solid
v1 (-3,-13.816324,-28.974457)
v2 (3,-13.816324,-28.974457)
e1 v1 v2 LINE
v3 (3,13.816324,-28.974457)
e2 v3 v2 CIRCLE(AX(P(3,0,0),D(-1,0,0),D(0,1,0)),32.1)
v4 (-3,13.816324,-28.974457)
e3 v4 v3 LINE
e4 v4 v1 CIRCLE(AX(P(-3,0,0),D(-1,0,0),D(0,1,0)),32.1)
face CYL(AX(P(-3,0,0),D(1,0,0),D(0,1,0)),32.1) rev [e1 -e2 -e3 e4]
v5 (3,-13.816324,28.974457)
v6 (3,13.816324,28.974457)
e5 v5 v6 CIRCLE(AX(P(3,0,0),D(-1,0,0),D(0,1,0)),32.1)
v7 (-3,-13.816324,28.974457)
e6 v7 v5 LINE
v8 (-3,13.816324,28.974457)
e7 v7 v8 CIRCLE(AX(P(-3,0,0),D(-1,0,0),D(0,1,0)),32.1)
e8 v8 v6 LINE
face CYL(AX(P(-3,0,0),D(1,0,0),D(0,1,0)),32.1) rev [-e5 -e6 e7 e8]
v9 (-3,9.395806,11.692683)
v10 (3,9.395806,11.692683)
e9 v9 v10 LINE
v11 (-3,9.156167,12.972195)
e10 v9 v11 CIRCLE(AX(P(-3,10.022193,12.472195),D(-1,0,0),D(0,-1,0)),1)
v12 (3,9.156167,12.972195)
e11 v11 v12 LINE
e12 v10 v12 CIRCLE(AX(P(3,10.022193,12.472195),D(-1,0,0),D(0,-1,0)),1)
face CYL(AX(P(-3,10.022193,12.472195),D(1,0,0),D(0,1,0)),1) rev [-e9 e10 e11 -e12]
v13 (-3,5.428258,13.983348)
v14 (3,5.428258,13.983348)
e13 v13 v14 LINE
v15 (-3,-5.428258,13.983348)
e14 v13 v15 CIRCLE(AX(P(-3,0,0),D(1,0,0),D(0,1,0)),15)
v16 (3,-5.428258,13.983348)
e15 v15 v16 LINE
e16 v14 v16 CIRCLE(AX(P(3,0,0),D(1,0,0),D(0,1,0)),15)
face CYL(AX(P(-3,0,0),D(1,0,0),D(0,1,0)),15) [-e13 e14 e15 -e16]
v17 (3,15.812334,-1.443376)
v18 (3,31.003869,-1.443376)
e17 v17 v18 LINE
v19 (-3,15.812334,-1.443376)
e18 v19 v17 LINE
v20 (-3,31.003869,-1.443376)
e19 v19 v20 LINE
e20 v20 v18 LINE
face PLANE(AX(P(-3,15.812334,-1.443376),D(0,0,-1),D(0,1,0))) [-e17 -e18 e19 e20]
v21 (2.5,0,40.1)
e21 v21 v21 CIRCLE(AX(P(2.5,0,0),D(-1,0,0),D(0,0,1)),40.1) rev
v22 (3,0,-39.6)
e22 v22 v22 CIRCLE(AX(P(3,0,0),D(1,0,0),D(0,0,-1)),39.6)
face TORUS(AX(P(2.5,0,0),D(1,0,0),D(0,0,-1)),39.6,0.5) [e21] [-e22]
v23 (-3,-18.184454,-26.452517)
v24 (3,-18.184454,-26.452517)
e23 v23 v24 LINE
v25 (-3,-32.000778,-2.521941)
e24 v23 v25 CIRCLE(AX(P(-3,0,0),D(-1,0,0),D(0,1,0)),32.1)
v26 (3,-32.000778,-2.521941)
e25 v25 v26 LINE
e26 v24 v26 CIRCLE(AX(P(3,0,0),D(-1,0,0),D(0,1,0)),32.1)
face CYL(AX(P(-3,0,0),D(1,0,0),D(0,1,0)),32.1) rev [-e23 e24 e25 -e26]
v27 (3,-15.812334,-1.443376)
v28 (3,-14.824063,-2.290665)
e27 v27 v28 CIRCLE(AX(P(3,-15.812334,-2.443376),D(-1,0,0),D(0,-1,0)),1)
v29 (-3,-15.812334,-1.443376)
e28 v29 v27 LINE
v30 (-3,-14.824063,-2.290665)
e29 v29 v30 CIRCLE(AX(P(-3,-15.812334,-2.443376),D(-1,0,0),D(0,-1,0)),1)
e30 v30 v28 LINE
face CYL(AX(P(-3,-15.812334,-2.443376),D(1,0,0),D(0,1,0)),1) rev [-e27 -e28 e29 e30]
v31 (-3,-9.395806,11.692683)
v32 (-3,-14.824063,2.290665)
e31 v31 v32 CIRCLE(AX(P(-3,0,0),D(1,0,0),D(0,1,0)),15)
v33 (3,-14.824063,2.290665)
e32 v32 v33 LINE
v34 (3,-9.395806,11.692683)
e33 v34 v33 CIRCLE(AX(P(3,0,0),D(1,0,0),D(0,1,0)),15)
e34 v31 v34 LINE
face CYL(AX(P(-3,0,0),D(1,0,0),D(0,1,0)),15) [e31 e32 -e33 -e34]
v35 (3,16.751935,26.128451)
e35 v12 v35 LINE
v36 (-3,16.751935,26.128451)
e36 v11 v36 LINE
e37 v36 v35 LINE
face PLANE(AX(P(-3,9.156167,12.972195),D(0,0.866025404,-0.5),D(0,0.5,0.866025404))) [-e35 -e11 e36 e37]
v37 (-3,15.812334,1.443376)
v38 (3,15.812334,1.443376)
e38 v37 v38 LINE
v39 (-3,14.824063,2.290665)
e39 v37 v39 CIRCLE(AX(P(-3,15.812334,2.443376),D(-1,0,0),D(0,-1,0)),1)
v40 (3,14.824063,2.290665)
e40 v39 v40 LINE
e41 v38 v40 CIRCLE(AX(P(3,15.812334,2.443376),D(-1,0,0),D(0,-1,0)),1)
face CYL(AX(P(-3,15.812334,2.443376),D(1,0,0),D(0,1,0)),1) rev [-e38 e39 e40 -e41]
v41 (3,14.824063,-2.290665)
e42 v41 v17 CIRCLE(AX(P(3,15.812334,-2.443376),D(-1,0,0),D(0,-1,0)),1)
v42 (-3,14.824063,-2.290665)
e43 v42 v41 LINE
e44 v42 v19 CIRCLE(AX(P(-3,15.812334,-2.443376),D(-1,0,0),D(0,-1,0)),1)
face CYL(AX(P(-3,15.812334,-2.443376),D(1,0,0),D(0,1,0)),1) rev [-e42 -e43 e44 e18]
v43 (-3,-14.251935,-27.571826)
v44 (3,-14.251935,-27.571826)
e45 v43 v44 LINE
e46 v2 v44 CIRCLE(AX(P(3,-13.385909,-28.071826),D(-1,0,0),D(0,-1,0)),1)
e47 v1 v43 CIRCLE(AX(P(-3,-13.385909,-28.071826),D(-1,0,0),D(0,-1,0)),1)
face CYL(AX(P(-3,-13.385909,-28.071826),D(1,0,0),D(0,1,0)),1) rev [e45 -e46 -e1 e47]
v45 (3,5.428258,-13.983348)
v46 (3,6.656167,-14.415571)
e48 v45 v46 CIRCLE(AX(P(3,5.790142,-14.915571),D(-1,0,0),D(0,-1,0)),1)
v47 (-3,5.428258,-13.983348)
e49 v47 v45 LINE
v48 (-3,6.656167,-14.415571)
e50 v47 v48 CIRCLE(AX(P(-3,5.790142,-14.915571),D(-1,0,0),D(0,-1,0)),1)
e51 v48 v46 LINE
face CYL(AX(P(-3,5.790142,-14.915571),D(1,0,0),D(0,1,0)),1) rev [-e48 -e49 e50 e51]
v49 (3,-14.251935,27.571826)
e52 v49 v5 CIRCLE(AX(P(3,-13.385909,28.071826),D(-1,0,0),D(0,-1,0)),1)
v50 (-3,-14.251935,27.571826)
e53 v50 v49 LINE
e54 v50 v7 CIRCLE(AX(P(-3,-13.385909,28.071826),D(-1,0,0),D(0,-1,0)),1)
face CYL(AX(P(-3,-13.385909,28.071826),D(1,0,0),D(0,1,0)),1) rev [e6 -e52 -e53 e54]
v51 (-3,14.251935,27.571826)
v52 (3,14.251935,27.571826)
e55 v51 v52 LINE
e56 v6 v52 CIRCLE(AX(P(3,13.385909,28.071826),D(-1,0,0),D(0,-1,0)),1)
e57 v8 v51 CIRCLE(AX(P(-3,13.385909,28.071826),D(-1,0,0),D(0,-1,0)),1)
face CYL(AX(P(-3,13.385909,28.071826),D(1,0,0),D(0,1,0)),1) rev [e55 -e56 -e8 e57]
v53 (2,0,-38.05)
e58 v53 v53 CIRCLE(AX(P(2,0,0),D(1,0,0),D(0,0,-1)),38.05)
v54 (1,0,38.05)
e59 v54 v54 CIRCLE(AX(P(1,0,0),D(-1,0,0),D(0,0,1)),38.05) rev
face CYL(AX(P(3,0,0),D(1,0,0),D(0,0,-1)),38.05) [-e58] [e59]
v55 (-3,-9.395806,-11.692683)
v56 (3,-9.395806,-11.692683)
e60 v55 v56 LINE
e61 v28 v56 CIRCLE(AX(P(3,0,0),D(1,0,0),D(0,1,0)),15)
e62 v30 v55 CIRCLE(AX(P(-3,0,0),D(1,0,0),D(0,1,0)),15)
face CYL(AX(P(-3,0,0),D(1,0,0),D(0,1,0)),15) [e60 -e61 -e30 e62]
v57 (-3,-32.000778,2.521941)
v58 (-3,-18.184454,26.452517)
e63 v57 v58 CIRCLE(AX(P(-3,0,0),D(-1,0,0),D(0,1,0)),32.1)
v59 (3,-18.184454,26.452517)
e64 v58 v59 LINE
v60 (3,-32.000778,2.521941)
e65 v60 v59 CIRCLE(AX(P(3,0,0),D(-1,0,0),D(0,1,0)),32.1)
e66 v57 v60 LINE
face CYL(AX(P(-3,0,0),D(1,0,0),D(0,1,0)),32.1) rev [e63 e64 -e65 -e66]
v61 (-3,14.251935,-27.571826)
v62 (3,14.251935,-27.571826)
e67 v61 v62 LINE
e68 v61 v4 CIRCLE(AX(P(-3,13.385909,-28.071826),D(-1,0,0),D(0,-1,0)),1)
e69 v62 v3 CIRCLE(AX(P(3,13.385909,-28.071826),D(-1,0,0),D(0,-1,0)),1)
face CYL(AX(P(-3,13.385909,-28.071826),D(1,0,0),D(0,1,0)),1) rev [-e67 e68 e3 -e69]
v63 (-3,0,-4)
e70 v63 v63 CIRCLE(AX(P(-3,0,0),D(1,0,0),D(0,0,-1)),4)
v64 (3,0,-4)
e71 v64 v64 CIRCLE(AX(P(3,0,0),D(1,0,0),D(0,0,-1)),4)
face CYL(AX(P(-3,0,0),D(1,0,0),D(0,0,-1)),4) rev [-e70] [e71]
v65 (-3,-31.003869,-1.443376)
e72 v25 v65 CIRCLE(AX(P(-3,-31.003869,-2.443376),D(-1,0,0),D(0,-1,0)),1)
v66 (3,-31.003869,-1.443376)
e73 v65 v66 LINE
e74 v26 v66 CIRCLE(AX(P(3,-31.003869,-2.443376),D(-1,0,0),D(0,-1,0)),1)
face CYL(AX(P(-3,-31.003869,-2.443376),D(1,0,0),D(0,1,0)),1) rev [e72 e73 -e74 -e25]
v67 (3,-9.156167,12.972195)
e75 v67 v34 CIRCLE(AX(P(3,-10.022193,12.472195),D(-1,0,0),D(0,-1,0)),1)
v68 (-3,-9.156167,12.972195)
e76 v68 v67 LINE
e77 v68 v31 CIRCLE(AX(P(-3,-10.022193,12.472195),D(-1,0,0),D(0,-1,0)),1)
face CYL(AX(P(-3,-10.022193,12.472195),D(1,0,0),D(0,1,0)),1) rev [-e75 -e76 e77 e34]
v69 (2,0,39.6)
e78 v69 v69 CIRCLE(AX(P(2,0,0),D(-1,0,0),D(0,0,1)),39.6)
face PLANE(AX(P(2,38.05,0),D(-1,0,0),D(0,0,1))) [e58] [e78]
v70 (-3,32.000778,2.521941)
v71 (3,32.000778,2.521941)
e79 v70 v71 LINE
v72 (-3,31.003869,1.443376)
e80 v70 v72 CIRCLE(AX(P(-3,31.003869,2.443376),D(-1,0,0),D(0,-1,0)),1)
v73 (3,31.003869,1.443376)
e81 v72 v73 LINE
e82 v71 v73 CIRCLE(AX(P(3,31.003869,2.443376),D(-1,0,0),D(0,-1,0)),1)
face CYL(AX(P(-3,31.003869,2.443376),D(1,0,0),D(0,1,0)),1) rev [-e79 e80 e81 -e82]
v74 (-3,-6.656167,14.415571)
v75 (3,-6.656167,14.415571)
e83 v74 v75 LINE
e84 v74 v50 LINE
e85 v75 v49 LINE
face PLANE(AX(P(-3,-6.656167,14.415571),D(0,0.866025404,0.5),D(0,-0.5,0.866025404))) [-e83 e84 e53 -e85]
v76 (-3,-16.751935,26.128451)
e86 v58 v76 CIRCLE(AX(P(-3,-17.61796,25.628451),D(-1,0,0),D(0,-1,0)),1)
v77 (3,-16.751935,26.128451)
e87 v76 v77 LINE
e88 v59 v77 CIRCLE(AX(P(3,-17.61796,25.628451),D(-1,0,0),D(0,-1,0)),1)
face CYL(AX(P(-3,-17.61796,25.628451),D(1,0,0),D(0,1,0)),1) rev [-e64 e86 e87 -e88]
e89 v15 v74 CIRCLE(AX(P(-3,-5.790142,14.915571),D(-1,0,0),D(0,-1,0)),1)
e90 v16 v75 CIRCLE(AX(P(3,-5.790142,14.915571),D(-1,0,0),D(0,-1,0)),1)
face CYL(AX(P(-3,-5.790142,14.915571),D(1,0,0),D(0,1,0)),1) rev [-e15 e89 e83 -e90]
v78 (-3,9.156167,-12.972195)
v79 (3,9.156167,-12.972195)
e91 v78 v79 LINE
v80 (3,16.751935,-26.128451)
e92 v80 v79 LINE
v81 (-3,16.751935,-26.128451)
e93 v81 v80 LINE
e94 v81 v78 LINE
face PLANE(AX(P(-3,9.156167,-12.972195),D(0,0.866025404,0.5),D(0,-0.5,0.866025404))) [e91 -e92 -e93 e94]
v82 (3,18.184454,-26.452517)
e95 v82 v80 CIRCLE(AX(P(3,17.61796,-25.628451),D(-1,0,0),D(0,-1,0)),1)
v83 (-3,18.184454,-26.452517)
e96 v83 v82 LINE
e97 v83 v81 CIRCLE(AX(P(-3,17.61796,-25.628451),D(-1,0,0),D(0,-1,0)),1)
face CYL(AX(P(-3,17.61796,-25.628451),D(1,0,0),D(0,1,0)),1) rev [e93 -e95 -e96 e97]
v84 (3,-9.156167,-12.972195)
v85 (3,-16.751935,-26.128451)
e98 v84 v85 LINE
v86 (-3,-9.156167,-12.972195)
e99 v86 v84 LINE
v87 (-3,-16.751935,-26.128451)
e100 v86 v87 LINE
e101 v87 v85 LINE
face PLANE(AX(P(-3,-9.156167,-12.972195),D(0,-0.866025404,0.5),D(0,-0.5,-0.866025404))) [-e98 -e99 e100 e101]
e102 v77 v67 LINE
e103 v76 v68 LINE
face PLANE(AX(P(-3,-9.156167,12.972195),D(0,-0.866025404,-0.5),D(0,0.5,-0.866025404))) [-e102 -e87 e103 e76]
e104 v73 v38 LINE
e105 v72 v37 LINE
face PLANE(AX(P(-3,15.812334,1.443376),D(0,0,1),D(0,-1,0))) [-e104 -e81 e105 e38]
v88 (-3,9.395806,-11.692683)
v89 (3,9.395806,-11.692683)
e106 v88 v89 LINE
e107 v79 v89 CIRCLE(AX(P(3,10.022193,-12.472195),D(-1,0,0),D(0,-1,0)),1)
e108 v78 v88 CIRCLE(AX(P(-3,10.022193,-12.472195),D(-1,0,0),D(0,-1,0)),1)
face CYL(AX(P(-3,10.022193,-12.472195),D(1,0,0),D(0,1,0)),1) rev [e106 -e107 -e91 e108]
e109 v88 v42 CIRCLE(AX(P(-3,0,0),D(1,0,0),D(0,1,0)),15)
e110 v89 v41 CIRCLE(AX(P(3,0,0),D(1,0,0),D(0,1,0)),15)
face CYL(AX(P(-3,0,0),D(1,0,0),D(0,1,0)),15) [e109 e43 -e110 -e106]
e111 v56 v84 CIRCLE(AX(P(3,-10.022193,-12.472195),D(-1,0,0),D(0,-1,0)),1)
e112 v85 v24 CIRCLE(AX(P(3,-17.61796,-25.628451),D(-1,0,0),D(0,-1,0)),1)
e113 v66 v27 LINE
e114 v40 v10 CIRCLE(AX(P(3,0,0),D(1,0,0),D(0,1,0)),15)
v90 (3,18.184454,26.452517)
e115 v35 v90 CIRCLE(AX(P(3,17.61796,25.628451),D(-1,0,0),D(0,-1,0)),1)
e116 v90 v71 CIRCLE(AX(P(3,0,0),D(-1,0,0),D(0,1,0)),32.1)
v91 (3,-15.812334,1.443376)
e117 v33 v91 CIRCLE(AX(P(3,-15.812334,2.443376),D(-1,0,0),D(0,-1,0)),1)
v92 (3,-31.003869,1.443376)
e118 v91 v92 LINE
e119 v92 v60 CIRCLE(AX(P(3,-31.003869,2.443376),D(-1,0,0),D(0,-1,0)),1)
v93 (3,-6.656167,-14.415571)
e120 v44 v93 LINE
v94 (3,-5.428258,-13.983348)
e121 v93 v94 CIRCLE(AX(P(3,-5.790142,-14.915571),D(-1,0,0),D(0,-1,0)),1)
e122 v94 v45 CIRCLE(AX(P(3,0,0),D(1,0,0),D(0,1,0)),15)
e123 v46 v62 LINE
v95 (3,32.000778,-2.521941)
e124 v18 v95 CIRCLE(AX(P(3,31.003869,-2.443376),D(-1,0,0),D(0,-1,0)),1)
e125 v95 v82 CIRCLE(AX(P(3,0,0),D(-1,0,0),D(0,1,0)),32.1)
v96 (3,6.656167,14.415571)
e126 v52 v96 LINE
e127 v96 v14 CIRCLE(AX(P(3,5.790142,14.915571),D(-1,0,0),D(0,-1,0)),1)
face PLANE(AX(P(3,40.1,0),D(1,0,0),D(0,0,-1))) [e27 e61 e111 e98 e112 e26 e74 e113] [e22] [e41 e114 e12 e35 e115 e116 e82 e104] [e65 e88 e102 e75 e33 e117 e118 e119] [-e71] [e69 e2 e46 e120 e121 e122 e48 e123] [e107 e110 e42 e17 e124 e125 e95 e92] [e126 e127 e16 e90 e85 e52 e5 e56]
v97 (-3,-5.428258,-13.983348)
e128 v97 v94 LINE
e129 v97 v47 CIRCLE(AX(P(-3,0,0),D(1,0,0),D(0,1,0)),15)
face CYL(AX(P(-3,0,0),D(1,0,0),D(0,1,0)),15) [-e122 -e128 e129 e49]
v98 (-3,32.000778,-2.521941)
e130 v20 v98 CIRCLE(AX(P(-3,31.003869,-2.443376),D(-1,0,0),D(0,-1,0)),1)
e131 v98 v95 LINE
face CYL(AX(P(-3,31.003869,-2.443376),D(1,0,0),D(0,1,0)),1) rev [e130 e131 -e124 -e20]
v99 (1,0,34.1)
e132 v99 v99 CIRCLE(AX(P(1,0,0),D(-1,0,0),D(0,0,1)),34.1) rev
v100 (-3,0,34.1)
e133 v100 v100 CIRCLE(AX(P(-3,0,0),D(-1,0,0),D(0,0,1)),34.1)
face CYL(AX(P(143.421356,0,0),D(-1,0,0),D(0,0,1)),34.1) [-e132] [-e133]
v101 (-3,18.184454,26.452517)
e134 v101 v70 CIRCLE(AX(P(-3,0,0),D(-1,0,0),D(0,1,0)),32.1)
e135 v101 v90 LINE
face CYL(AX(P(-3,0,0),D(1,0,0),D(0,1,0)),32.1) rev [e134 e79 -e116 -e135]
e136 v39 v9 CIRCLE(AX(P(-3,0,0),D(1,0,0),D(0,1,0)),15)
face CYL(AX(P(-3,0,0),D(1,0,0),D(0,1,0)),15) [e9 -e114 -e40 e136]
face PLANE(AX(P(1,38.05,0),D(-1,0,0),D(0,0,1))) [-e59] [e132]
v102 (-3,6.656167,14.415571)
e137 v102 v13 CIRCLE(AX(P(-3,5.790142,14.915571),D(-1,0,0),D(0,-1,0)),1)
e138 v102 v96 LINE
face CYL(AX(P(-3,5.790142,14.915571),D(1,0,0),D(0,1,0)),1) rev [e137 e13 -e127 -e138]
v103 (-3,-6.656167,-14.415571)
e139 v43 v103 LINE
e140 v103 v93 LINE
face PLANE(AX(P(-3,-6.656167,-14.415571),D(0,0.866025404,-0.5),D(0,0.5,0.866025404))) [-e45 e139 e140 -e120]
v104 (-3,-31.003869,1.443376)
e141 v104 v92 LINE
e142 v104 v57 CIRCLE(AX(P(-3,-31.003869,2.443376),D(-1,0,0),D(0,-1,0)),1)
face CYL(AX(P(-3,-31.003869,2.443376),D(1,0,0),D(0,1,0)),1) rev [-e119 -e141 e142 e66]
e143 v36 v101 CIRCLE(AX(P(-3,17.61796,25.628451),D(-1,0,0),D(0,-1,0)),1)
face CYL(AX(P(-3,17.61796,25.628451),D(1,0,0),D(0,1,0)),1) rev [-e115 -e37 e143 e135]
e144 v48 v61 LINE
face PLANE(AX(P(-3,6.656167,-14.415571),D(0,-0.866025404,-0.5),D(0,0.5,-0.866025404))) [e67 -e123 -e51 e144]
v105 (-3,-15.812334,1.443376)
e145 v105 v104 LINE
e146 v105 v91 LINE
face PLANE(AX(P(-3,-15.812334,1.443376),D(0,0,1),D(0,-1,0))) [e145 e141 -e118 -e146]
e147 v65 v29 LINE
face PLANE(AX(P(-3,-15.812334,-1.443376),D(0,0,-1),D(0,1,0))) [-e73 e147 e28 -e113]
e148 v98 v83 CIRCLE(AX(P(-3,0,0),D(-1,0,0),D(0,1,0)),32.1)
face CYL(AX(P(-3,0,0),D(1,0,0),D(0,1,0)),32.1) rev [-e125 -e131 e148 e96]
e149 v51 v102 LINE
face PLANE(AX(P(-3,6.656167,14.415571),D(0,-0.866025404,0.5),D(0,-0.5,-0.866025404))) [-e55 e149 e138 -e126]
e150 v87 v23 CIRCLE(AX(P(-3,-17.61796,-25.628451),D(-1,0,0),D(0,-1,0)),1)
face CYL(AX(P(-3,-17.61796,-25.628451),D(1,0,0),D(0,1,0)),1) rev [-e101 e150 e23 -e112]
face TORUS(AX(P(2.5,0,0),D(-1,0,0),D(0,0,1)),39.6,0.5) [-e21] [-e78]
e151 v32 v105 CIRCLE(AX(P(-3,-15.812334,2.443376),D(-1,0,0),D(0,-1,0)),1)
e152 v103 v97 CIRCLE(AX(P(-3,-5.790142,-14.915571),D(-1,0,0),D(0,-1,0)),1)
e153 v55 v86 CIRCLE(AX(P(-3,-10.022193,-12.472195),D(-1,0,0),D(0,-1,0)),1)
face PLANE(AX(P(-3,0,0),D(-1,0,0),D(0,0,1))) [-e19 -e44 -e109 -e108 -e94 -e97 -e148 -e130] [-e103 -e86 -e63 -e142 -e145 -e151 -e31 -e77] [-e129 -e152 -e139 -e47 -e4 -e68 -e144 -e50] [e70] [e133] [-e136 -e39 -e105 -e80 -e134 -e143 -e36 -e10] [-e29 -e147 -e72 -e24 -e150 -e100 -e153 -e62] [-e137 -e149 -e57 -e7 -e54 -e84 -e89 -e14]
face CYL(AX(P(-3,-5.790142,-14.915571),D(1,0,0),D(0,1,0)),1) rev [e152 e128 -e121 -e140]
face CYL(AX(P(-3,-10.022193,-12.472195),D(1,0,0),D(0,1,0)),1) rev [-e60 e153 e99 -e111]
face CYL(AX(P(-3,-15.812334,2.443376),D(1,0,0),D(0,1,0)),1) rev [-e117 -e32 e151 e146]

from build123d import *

# Parameters (mm, degrees)
CUT_EXTRUDE2_DEPTH      = 58.026485075
FILLET1_R               = 0.5
CUT_EXTRUDE5_DEPTH      = 58.026485145
CUT_EXTRUDE5_DEPTH_BACK = 58.026485145
SKETCH7_R               = 4
SKETCH9_R               = 50
SKETCH9_R_2             = 34.1
CUT_EXTRUDE6_DEPTH      = 4


with BuildPart() as part:
    # Sketch1 → Revolve2 (revolve)
    with BuildSketch(Plane.XY, mode=Mode.PRIVATE) as revolve2_sk:
        Polygon((-3, 0), (-3, 38.05), (2, 38.05), (2, 40.1), (3, 40.1), (3, 0), align=None)
    revolve(revolve2_sk.sketch.rotate(Axis((3, 0, 0), (-1, 0, 0)), 90), axis=Axis((3, 0, 0), (-1, 0, 0)))

    # Sketch2 → Cut-Extrude2 (cut, through all)
    with BuildSketch(Plane.ZY.offset(-3)):
        with BuildLine():
            Line((14.415571014, 6.656167139), (27.571826318, 14.25193468))
            ThreePointArc((27.571826318, 14.25193468), (28.368418684, 14.340913448), (28.97445739, 13.816324366))
            ThreePointArc((28.97445739, 13.816324366), (32.1, 0), (28.97445739, -13.816324366))
            ThreePointArc((28.97445739, -13.816324366), (28.368418684, -14.340913448), (27.571826318, -14.25193468))
            Line((27.571826318, -14.25193468), (14.415571014, -6.656167139))
            ThreePointArc((14.415571014, -6.656167139), (13.972302174, -6.122171697), (13.983347826, -5.428257877))
            ThreePointArc((13.983347826, -5.428257877), (15, 0), (13.983347826, 5.428257877))
            ThreePointArc((13.983347826, 5.428257877), (13.972302174, 6.122171697), (14.415571014, 6.656167139))
        make_face()
        with BuildLine():
            Line((12.972195341, -9.156167139), (26.128450645, -16.75193468))
            ThreePointArc((26.128450645, -16.75193468), (26.603804702, -17.397314521), (26.452516582, -18.184453977))
            ThreePointArc((26.452516582, -18.184453977), (16.05, -27.799415461), (2.521940807, -32.000778343))
            ThreePointArc((2.521940807, -32.000778343), (1.764613982, -31.73822797), (1.443375673, -31.00386936))
            Line((1.443375673, -31.00386936), (1.443375673, -15.812334278))
            ThreePointArc((1.443375673, -15.812334278), (1.684194871, -15.161454481), (2.290664693, -14.824063386))
            ThreePointArc((2.290664693, -14.824063386), (7.5, -12.990381057), (11.692683133, -9.395805509))
            ThreePointArc((11.692683133, -9.395805509), (12.288107303, -9.039282784), (12.972195341, -9.156167139))
        make_face()
        with BuildLine():
            Line((-1.443375673, -15.812334278), (-1.443375673, -31.00386936))
            ThreePointArc((-1.443375673, -31.00386936), (-1.764613982, -31.73822797), (-2.521940807, -32.000778343))
            ThreePointArc((-2.521940807, -32.000778343), (-16.05, -27.799415461), (-26.452516582, -18.184453977))
            ThreePointArc((-26.452516582, -18.184453977), (-26.603804702, -17.397314521), (-26.128450645, -16.75193468))
            Line((-26.128450645, -16.75193468), (-12.972195341, -9.156167139))
            ThreePointArc((-12.972195341, -9.156167139), (-12.288107303, -9.039282784), (-11.692683133, -9.395805509))
            ThreePointArc((-11.692683133, -9.395805509), (-7.5, -12.990381057), (-2.290664693, -14.824063386))
            ThreePointArc((-2.290664693, -14.824063386), (-1.684194871, -15.161454481), (-1.443375673, -15.812334278))
        make_face()
        with BuildLine():
            Line((-14.415571014, -6.656167139), (-27.571826318, -14.25193468))
            ThreePointArc((-27.571826318, -14.25193468), (-28.368418684, -14.340913448), (-28.97445739, -13.816324366))
            ThreePointArc((-28.97445739, -13.816324366), (-32.1, 0), (-28.97445739, 13.816324366))
            ThreePointArc((-28.97445739, 13.816324366), (-28.368418684, 14.340913448), (-27.571826318, 14.25193468))
            Line((-27.571826318, 14.25193468), (-14.415571014, 6.656167139))
            ThreePointArc((-14.415571014, 6.656167139), (-13.972302174, 6.122171697), (-13.983347826, 5.428257877))
            ThreePointArc((-13.983347826, 5.428257877), (-15, 0), (-13.983347826, -5.428257877))
            ThreePointArc((-13.983347826, -5.428257877), (-13.972302174, -6.122171697), (-14.415571014, -6.656167139))
        make_face()
        with BuildLine():
            Line((-12.972195341, 9.156167139), (-26.128450645, 16.75193468))
            ThreePointArc((-26.128450645, 16.75193468), (-26.603804702, 17.397314521), (-26.452516582, 18.184453977))
            ThreePointArc((-26.452516582, 18.184453977), (-16.05, 27.799415461), (-2.521940807, 32.000778343))
            ThreePointArc((-2.521940807, 32.000778343), (-1.764613982, 31.73822797), (-1.443375673, 31.00386936))
            Line((-1.443375673, 31.00386936), (-1.443375673, 15.812334278))
            ThreePointArc((-1.443375673, 15.812334278), (-1.684194871, 15.161454481), (-2.290664693, 14.824063386))
            ThreePointArc((-2.290664693, 14.824063386), (-7.5, 12.990381057), (-11.692683133, 9.395805509))
            ThreePointArc((-11.692683133, 9.395805509), (-12.288107303, 9.039282784), (-12.972195341, 9.156167139))
        make_face()
        with BuildLine():
            Line((1.443375673, 15.812334278), (1.443375673, 31.00386936))
            ThreePointArc((1.443375673, 31.00386936), (1.764613982, 31.73822797), (2.521940807, 32.000778343))
            ThreePointArc((2.521940807, 32.000778343), (16.05, 27.799415461), (26.452516582, 18.184453977))
            ThreePointArc((26.452516582, 18.184453977), (26.603804702, 17.397314521), (26.128450645, 16.75193468))
            Line((26.128450645, 16.75193468), (12.972195341, 9.156167139))
            ThreePointArc((12.972195341, 9.156167139), (12.288107303, 9.039282784), (11.692683133, 9.395805509))
            ThreePointArc((11.692683133, 9.395805509), (7.5, 12.990381057), (2.290664693, 14.824063386))
            ThreePointArc((2.290664693, 14.824063386), (1.684194871, 15.161454481), (1.443375673, 15.812334278))
        make_face()
    extrude(amount=CUT_EXTRUDE2_DEPTH, mode=Mode.SUBTRACT)

    # Fillet1
    fillet1_edges = [part.edges().sort_by_distance(p)[0] for p in [
        (3, 0, 40.1),
        (2, 0, 40.1),
    ]]
    fillet(fillet1_edges, radius=FILLET1_R - 0.0001)  # a hair under: the kernel refuses the full size

    # Sketch7 → Cut-Extrude5 (cut, two sides: drawn at the far end of the back side and taken through both)
    with BuildSketch(Plane(origin=(3, 0, 0), x_dir=(0, 0, -1), z_dir=(1, 0, 0)).offset(-CUT_EXTRUDE5_DEPTH_BACK)):
        Circle(SKETCH7_R)
    extrude(amount=CUT_EXTRUDE5_DEPTH + CUT_EXTRUDE5_DEPTH_BACK, mode=Mode.SUBTRACT)

    # Sketch9 → Cut-Extrude6 (cut)
    with BuildSketch(Plane.ZY.offset(3)):
        Circle(SKETCH9_R)
        Circle(SKETCH9_R_2, mode=Mode.SUBTRACT)
    extrude(amount=-CUT_EXTRUDE6_DEPTH, mode=Mode.SUBTRACT)


solid = part.part
